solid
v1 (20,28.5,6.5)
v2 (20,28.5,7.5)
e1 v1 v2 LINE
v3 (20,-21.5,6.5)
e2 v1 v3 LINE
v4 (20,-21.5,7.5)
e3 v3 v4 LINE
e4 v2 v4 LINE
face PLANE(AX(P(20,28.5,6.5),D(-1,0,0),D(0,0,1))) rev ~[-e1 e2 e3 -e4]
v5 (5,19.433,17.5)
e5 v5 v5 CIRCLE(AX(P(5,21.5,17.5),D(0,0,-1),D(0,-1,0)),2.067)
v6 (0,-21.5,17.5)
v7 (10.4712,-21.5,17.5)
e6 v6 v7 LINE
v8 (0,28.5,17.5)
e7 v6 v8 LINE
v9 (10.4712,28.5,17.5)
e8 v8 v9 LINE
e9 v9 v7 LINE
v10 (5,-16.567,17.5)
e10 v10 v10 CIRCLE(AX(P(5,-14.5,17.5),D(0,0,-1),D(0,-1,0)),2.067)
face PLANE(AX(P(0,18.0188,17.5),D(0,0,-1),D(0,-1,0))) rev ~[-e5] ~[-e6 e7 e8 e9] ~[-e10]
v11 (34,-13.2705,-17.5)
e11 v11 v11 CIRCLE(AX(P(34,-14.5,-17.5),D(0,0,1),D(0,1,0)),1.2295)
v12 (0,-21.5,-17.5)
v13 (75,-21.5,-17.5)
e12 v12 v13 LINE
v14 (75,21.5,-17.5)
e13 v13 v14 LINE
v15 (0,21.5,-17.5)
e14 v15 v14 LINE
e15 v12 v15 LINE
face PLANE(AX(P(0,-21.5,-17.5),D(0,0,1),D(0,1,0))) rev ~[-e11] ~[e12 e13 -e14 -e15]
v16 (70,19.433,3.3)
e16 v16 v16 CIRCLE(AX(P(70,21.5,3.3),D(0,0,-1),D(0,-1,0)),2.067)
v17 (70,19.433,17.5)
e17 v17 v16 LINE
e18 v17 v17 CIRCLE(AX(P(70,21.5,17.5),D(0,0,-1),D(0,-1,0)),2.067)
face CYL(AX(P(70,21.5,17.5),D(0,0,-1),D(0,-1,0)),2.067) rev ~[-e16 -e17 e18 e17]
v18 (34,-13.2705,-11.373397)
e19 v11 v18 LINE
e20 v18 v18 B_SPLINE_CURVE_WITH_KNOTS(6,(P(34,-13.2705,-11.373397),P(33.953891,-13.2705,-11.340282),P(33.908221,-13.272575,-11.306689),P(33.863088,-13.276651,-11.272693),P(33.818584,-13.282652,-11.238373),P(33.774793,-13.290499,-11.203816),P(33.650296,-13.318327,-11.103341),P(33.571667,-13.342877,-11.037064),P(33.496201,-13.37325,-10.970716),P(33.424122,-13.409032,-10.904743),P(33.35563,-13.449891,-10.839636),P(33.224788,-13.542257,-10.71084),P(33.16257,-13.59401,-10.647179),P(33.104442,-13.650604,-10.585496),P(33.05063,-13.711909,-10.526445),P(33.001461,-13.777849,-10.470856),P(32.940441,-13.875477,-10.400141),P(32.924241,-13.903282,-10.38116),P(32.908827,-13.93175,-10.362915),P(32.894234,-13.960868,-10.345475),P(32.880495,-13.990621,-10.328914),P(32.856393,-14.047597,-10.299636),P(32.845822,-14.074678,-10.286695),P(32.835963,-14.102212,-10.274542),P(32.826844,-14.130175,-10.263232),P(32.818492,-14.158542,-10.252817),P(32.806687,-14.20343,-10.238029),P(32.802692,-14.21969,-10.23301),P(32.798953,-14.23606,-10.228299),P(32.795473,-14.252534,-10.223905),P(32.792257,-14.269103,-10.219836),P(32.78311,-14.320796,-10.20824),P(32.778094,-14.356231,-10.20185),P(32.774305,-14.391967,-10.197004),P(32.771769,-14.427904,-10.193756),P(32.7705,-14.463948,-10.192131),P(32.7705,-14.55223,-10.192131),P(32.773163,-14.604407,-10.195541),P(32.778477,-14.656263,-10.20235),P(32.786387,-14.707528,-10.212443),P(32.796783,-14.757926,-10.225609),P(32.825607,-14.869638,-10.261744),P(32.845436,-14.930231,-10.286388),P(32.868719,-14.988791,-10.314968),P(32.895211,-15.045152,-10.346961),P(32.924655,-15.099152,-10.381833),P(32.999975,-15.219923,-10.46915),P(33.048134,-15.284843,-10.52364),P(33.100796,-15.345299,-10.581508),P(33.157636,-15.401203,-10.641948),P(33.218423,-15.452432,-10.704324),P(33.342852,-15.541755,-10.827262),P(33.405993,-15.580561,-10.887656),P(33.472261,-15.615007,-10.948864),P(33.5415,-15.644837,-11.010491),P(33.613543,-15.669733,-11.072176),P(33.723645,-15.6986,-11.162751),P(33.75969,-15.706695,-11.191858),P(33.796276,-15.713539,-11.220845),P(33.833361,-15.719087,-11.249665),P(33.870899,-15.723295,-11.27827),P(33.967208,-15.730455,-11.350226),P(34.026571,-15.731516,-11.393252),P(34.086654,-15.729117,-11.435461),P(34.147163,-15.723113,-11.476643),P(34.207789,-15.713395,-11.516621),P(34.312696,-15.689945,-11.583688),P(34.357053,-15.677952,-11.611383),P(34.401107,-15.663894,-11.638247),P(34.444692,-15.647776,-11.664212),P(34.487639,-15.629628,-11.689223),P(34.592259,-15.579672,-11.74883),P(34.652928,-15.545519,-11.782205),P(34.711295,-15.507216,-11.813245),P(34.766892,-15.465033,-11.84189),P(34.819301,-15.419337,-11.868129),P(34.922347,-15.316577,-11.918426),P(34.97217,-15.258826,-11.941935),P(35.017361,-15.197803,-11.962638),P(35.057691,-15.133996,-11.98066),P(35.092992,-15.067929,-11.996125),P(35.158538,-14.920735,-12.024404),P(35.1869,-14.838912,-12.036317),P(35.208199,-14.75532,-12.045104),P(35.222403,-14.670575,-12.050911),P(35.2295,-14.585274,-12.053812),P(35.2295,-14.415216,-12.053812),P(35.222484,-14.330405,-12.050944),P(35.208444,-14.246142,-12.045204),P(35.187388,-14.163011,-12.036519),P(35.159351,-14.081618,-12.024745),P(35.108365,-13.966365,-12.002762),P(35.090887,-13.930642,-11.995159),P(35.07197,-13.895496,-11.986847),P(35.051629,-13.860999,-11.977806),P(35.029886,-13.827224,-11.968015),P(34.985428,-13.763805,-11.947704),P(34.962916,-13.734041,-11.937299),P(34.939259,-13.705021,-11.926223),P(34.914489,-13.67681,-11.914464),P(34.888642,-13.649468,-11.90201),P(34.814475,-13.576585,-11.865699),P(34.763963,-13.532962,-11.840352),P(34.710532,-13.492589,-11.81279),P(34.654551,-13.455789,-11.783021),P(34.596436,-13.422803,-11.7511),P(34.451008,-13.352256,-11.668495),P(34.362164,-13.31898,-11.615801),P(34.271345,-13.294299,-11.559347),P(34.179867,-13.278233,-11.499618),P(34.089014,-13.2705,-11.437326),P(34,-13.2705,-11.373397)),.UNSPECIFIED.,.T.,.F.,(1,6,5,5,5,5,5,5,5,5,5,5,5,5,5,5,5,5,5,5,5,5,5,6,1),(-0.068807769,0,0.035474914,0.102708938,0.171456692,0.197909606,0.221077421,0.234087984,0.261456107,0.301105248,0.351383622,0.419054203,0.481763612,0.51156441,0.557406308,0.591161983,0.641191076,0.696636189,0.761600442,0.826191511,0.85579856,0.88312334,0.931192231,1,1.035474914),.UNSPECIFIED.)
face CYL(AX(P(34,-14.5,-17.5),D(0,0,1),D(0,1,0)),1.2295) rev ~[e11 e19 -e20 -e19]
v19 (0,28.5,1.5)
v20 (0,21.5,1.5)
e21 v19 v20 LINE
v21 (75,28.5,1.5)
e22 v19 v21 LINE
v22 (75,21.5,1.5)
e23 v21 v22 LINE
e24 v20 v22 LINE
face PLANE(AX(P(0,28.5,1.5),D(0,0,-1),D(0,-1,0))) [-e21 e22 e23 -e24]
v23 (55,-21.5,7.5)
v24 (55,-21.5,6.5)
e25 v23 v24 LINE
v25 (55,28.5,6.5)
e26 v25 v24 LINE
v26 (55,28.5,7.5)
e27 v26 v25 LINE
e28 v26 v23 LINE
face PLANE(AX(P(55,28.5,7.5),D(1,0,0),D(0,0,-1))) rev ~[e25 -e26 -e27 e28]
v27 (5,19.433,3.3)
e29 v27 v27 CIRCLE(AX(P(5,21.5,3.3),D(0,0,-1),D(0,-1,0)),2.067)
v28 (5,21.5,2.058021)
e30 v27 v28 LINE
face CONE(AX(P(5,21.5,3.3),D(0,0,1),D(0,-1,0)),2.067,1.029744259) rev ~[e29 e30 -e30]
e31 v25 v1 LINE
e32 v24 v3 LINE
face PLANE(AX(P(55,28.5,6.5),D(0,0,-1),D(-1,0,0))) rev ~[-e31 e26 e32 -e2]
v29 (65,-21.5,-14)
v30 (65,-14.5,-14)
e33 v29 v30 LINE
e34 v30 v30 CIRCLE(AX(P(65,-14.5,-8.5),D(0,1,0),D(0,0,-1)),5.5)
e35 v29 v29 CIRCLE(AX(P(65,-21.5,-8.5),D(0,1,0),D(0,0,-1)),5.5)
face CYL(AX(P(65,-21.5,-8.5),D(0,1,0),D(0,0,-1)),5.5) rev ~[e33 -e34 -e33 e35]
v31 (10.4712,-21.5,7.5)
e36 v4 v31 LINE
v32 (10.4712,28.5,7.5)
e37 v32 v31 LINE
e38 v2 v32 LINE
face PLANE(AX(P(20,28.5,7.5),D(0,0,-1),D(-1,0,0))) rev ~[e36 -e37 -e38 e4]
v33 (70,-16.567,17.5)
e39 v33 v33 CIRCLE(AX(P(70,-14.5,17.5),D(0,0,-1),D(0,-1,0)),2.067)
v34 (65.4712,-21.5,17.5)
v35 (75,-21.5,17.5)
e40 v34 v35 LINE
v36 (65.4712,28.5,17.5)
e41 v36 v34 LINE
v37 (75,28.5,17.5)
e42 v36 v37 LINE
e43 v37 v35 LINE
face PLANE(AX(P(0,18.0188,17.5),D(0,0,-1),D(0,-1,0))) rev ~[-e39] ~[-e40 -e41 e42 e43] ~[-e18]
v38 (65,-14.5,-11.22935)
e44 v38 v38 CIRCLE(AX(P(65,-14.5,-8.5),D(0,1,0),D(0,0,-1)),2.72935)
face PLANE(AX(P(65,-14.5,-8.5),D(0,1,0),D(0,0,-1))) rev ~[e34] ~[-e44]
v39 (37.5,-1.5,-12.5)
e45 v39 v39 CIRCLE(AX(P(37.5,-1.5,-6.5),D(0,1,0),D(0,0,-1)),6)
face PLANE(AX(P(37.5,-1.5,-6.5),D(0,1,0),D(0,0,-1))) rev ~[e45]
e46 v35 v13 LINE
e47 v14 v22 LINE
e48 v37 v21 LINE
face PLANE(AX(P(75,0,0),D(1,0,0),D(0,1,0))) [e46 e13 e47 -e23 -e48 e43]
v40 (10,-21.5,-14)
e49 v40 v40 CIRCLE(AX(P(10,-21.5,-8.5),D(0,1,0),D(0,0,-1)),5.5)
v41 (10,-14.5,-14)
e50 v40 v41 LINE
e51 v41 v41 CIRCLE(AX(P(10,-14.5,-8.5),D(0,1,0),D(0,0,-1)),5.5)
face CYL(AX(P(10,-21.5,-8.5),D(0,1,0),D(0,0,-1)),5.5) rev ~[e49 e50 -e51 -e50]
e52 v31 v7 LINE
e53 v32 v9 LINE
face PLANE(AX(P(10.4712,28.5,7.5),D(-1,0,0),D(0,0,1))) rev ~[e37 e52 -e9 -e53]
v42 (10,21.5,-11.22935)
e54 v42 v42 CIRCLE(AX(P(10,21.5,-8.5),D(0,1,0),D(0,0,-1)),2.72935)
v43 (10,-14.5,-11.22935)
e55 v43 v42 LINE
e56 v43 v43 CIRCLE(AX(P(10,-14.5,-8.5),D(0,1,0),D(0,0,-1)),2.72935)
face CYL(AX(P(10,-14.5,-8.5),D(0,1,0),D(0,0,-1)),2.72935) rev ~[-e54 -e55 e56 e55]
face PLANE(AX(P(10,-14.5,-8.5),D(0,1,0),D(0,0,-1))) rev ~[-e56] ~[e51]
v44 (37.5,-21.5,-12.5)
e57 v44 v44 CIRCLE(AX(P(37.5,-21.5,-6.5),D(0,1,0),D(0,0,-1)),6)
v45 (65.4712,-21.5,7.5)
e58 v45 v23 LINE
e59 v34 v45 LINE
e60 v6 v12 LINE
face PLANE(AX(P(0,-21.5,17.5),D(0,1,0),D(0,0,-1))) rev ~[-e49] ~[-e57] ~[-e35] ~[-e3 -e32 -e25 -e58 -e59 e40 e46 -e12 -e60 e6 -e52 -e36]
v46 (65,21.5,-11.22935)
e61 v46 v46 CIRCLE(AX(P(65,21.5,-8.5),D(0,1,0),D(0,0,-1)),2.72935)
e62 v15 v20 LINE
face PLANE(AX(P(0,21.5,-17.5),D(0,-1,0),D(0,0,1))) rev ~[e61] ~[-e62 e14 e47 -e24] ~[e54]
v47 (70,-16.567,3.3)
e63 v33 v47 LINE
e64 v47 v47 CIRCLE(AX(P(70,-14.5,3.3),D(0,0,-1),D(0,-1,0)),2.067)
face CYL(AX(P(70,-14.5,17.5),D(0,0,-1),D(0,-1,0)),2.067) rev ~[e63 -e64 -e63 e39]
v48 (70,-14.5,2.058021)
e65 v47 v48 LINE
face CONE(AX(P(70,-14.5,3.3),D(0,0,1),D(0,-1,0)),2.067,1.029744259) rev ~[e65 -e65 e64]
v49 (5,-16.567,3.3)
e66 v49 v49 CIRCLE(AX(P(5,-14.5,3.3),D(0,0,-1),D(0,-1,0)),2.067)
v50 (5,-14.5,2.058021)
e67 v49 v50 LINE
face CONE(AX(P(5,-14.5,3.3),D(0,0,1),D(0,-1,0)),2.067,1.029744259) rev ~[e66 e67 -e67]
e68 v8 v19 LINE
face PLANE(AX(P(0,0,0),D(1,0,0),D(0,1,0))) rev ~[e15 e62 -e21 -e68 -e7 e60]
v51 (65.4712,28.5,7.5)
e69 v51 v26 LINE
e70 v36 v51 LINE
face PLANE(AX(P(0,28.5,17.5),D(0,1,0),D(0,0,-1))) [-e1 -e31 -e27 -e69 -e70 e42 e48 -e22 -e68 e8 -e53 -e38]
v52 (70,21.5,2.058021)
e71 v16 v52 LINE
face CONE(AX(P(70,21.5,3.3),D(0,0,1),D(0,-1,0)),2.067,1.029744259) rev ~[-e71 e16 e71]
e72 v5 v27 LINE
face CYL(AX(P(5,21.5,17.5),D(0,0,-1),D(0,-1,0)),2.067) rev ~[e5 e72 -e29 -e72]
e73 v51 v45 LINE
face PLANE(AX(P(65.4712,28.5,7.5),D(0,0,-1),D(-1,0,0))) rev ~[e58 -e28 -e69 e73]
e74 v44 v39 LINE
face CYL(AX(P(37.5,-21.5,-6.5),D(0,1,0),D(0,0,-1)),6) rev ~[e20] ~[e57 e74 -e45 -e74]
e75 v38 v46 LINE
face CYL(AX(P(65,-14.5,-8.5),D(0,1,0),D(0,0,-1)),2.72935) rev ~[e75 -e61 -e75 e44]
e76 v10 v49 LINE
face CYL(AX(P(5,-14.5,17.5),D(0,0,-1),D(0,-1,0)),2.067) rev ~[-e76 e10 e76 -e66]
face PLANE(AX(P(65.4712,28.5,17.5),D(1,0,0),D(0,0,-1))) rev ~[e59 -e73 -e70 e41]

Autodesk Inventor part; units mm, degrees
ref_plane "YZ Plane" through (0, 0, 0) normal (1, 0, 0) x (0, 1, 0)
ref_plane "XZ Plane" through (0, 0, 0) normal (0, 1, 0) x (-1, 0, 0)
ref_plane "XY Plane" through (0, 0, 0) normal (0, 0, 1) x (1, 0, 0)
sketch "Sketch1" plane through (0, 0, 0) normal (1, 0, 0) x (0, 1, 0)
  line L0 (-21.5, -17.5) -> (21.5, -17.5)
  line L1 (21.5, -17.5) -> (21.5, 1.5)
  line L2 (21.5, 17.5) -> (-21.5, 17.5)
  line L3 (-21.5, 17.5) -> (-21.5, -17.5)
  line L4 (-21.5, -17.5) -> (21.5, 17.5) construction
  line L5 (21.5, -17.5) -> (-21.5, 17.5) construction
  line L6 (18.0188, 17.5) -> (28.5, 17.5)
  line L7 (28.5, 17.5) -> (28.5, 1.5)
  line L8 (28.5, 1.5) -> (21.5, 1.5)
  point P0 (0, 0)
  dimension "d0" = 43
  dimension "d1" = 35
  dimension "d2" = 50
  dimension "d3" = 16
extrude "Extrusion1" add sketch "Sketch1" along normal blind 75
sketch "Sketch2" plane through (0, 28.5, 17.5) normal (0, 1, 0) x (1, 0, 0)
  line L0 (0, 0) -> (75, 0) projected
  line L1 (65.4712, 0) -> (65.4712, 10)
  line L2 (65.4712, 10) -> (55, 10)
  line L3 (55, 10) -> (55, 11)
  line L4 (55, 11) -> (20, 11)
  line L5 (20, 11) -> (20, 10)
  line L6 (20, 10) -> (10.4712, 10)
  line L7 (10.4712, 10) -> (10.4712, 0)
  line L8 (0, 35) -> (75, 35) projected
  line L9 (37.5, 35) -> (37.5, 5.3668)
  point P0 (0, 17.5)
  dimension "d6" = 55
  dimension "d7" = 35
  dimension "d8" = 17.5
  dimension "d9" = 11
  dimension "d10" = 10
extrude "Extrusion2" cut sketch "Sketch2" against normal blind 75
sketch "Sketch6" plane through (0, -21.5, 17.5) normal (0, 0, 1) x (1, 0, 0)
  line L0 (0, 50) -> (0, 0) projected
  line L1 (0, 0) -> (10.4712, 0) projected
  point P0 (0, 21.5)
  point P1 (5, 7)
  dimension "d31" = 5
  dimension "d32" = 7
hole "Hole1" at (5, -14.5, 17.5) direction (0, 0, -1) diameter 4.134 depth 14.2 tip angle 118 thread size "M5x0.8" class "6H" standard "ISO Metric profile"
pattern_linear "Rectangular Pattern1" count 2 spacing 36 along (0, 1, 0) count 2 spacing 65 along (1, 0, 0) of "Hole1"
sketch "Sketch8" plane through (0, -21.5, -17.5) normal (0, -1, 0) x (1, 0, 0)
  line L0 (0, 35) -> (0, 0) projected
  line L1 (0, 35) -> (10.4712, 35) projected
  point P0 (0, 17.5)
  point P1 (37.5, 11)
  dimension "d55" = 37.5
  dimension "d56" = 24
hole "Hole3" at (37.5, -21.5, -6.5) direction (0, 1, 0) diameter 12 depth 20
sketch "Sketch9" plane through (0, -21.5, -17.5) normal (0, 0, -1) x (-1, 0, 0)
  line L0 (0, 0) -> (0, 43) projected
  line L1 (0, 0) -> (-75, 0) projected
  point P0 (0, 21.5)
  point P1 (-34, 7)
  dimension "d64" = 34
  dimension "d65" = 7
hole "Hole4" at (34, -14.5, -17.5) direction (0, 0, 1) diameter 2.459 depth 8.8 thread size "M3x0.5" class "6H" standard "ISO Metric profile"
sketch "Sketch10" plane through (0, -21.5, -17.5) normal (0, -1, 0) x (1, 0, 0)
  line L0 (0, 35) -> (0, 0) projected
  line L1 (0, 35) -> (10.4712, 35) projected
  line L2 (65.4712, 35) -> (75, 35) projected
  point P0 (0, 17.5)
  point P1 (65, 9)
  point P2 (10, 9)
  dimension "d84" = 10
  dimension "d85" = 55
  dimension "d86" = 26
  dimension "d87" = 26
hole "Hole6" at (65, -21.5, -8.5) at (10, -21.5, -8.5) direction (0, 1, 0) diameter 5.4587 end through all counterbore diameter 11 counterbore depth 7 thread size "M6x0.5" class "6H" standard "ISO Metric profile"
properties part number "Lose Backe"
